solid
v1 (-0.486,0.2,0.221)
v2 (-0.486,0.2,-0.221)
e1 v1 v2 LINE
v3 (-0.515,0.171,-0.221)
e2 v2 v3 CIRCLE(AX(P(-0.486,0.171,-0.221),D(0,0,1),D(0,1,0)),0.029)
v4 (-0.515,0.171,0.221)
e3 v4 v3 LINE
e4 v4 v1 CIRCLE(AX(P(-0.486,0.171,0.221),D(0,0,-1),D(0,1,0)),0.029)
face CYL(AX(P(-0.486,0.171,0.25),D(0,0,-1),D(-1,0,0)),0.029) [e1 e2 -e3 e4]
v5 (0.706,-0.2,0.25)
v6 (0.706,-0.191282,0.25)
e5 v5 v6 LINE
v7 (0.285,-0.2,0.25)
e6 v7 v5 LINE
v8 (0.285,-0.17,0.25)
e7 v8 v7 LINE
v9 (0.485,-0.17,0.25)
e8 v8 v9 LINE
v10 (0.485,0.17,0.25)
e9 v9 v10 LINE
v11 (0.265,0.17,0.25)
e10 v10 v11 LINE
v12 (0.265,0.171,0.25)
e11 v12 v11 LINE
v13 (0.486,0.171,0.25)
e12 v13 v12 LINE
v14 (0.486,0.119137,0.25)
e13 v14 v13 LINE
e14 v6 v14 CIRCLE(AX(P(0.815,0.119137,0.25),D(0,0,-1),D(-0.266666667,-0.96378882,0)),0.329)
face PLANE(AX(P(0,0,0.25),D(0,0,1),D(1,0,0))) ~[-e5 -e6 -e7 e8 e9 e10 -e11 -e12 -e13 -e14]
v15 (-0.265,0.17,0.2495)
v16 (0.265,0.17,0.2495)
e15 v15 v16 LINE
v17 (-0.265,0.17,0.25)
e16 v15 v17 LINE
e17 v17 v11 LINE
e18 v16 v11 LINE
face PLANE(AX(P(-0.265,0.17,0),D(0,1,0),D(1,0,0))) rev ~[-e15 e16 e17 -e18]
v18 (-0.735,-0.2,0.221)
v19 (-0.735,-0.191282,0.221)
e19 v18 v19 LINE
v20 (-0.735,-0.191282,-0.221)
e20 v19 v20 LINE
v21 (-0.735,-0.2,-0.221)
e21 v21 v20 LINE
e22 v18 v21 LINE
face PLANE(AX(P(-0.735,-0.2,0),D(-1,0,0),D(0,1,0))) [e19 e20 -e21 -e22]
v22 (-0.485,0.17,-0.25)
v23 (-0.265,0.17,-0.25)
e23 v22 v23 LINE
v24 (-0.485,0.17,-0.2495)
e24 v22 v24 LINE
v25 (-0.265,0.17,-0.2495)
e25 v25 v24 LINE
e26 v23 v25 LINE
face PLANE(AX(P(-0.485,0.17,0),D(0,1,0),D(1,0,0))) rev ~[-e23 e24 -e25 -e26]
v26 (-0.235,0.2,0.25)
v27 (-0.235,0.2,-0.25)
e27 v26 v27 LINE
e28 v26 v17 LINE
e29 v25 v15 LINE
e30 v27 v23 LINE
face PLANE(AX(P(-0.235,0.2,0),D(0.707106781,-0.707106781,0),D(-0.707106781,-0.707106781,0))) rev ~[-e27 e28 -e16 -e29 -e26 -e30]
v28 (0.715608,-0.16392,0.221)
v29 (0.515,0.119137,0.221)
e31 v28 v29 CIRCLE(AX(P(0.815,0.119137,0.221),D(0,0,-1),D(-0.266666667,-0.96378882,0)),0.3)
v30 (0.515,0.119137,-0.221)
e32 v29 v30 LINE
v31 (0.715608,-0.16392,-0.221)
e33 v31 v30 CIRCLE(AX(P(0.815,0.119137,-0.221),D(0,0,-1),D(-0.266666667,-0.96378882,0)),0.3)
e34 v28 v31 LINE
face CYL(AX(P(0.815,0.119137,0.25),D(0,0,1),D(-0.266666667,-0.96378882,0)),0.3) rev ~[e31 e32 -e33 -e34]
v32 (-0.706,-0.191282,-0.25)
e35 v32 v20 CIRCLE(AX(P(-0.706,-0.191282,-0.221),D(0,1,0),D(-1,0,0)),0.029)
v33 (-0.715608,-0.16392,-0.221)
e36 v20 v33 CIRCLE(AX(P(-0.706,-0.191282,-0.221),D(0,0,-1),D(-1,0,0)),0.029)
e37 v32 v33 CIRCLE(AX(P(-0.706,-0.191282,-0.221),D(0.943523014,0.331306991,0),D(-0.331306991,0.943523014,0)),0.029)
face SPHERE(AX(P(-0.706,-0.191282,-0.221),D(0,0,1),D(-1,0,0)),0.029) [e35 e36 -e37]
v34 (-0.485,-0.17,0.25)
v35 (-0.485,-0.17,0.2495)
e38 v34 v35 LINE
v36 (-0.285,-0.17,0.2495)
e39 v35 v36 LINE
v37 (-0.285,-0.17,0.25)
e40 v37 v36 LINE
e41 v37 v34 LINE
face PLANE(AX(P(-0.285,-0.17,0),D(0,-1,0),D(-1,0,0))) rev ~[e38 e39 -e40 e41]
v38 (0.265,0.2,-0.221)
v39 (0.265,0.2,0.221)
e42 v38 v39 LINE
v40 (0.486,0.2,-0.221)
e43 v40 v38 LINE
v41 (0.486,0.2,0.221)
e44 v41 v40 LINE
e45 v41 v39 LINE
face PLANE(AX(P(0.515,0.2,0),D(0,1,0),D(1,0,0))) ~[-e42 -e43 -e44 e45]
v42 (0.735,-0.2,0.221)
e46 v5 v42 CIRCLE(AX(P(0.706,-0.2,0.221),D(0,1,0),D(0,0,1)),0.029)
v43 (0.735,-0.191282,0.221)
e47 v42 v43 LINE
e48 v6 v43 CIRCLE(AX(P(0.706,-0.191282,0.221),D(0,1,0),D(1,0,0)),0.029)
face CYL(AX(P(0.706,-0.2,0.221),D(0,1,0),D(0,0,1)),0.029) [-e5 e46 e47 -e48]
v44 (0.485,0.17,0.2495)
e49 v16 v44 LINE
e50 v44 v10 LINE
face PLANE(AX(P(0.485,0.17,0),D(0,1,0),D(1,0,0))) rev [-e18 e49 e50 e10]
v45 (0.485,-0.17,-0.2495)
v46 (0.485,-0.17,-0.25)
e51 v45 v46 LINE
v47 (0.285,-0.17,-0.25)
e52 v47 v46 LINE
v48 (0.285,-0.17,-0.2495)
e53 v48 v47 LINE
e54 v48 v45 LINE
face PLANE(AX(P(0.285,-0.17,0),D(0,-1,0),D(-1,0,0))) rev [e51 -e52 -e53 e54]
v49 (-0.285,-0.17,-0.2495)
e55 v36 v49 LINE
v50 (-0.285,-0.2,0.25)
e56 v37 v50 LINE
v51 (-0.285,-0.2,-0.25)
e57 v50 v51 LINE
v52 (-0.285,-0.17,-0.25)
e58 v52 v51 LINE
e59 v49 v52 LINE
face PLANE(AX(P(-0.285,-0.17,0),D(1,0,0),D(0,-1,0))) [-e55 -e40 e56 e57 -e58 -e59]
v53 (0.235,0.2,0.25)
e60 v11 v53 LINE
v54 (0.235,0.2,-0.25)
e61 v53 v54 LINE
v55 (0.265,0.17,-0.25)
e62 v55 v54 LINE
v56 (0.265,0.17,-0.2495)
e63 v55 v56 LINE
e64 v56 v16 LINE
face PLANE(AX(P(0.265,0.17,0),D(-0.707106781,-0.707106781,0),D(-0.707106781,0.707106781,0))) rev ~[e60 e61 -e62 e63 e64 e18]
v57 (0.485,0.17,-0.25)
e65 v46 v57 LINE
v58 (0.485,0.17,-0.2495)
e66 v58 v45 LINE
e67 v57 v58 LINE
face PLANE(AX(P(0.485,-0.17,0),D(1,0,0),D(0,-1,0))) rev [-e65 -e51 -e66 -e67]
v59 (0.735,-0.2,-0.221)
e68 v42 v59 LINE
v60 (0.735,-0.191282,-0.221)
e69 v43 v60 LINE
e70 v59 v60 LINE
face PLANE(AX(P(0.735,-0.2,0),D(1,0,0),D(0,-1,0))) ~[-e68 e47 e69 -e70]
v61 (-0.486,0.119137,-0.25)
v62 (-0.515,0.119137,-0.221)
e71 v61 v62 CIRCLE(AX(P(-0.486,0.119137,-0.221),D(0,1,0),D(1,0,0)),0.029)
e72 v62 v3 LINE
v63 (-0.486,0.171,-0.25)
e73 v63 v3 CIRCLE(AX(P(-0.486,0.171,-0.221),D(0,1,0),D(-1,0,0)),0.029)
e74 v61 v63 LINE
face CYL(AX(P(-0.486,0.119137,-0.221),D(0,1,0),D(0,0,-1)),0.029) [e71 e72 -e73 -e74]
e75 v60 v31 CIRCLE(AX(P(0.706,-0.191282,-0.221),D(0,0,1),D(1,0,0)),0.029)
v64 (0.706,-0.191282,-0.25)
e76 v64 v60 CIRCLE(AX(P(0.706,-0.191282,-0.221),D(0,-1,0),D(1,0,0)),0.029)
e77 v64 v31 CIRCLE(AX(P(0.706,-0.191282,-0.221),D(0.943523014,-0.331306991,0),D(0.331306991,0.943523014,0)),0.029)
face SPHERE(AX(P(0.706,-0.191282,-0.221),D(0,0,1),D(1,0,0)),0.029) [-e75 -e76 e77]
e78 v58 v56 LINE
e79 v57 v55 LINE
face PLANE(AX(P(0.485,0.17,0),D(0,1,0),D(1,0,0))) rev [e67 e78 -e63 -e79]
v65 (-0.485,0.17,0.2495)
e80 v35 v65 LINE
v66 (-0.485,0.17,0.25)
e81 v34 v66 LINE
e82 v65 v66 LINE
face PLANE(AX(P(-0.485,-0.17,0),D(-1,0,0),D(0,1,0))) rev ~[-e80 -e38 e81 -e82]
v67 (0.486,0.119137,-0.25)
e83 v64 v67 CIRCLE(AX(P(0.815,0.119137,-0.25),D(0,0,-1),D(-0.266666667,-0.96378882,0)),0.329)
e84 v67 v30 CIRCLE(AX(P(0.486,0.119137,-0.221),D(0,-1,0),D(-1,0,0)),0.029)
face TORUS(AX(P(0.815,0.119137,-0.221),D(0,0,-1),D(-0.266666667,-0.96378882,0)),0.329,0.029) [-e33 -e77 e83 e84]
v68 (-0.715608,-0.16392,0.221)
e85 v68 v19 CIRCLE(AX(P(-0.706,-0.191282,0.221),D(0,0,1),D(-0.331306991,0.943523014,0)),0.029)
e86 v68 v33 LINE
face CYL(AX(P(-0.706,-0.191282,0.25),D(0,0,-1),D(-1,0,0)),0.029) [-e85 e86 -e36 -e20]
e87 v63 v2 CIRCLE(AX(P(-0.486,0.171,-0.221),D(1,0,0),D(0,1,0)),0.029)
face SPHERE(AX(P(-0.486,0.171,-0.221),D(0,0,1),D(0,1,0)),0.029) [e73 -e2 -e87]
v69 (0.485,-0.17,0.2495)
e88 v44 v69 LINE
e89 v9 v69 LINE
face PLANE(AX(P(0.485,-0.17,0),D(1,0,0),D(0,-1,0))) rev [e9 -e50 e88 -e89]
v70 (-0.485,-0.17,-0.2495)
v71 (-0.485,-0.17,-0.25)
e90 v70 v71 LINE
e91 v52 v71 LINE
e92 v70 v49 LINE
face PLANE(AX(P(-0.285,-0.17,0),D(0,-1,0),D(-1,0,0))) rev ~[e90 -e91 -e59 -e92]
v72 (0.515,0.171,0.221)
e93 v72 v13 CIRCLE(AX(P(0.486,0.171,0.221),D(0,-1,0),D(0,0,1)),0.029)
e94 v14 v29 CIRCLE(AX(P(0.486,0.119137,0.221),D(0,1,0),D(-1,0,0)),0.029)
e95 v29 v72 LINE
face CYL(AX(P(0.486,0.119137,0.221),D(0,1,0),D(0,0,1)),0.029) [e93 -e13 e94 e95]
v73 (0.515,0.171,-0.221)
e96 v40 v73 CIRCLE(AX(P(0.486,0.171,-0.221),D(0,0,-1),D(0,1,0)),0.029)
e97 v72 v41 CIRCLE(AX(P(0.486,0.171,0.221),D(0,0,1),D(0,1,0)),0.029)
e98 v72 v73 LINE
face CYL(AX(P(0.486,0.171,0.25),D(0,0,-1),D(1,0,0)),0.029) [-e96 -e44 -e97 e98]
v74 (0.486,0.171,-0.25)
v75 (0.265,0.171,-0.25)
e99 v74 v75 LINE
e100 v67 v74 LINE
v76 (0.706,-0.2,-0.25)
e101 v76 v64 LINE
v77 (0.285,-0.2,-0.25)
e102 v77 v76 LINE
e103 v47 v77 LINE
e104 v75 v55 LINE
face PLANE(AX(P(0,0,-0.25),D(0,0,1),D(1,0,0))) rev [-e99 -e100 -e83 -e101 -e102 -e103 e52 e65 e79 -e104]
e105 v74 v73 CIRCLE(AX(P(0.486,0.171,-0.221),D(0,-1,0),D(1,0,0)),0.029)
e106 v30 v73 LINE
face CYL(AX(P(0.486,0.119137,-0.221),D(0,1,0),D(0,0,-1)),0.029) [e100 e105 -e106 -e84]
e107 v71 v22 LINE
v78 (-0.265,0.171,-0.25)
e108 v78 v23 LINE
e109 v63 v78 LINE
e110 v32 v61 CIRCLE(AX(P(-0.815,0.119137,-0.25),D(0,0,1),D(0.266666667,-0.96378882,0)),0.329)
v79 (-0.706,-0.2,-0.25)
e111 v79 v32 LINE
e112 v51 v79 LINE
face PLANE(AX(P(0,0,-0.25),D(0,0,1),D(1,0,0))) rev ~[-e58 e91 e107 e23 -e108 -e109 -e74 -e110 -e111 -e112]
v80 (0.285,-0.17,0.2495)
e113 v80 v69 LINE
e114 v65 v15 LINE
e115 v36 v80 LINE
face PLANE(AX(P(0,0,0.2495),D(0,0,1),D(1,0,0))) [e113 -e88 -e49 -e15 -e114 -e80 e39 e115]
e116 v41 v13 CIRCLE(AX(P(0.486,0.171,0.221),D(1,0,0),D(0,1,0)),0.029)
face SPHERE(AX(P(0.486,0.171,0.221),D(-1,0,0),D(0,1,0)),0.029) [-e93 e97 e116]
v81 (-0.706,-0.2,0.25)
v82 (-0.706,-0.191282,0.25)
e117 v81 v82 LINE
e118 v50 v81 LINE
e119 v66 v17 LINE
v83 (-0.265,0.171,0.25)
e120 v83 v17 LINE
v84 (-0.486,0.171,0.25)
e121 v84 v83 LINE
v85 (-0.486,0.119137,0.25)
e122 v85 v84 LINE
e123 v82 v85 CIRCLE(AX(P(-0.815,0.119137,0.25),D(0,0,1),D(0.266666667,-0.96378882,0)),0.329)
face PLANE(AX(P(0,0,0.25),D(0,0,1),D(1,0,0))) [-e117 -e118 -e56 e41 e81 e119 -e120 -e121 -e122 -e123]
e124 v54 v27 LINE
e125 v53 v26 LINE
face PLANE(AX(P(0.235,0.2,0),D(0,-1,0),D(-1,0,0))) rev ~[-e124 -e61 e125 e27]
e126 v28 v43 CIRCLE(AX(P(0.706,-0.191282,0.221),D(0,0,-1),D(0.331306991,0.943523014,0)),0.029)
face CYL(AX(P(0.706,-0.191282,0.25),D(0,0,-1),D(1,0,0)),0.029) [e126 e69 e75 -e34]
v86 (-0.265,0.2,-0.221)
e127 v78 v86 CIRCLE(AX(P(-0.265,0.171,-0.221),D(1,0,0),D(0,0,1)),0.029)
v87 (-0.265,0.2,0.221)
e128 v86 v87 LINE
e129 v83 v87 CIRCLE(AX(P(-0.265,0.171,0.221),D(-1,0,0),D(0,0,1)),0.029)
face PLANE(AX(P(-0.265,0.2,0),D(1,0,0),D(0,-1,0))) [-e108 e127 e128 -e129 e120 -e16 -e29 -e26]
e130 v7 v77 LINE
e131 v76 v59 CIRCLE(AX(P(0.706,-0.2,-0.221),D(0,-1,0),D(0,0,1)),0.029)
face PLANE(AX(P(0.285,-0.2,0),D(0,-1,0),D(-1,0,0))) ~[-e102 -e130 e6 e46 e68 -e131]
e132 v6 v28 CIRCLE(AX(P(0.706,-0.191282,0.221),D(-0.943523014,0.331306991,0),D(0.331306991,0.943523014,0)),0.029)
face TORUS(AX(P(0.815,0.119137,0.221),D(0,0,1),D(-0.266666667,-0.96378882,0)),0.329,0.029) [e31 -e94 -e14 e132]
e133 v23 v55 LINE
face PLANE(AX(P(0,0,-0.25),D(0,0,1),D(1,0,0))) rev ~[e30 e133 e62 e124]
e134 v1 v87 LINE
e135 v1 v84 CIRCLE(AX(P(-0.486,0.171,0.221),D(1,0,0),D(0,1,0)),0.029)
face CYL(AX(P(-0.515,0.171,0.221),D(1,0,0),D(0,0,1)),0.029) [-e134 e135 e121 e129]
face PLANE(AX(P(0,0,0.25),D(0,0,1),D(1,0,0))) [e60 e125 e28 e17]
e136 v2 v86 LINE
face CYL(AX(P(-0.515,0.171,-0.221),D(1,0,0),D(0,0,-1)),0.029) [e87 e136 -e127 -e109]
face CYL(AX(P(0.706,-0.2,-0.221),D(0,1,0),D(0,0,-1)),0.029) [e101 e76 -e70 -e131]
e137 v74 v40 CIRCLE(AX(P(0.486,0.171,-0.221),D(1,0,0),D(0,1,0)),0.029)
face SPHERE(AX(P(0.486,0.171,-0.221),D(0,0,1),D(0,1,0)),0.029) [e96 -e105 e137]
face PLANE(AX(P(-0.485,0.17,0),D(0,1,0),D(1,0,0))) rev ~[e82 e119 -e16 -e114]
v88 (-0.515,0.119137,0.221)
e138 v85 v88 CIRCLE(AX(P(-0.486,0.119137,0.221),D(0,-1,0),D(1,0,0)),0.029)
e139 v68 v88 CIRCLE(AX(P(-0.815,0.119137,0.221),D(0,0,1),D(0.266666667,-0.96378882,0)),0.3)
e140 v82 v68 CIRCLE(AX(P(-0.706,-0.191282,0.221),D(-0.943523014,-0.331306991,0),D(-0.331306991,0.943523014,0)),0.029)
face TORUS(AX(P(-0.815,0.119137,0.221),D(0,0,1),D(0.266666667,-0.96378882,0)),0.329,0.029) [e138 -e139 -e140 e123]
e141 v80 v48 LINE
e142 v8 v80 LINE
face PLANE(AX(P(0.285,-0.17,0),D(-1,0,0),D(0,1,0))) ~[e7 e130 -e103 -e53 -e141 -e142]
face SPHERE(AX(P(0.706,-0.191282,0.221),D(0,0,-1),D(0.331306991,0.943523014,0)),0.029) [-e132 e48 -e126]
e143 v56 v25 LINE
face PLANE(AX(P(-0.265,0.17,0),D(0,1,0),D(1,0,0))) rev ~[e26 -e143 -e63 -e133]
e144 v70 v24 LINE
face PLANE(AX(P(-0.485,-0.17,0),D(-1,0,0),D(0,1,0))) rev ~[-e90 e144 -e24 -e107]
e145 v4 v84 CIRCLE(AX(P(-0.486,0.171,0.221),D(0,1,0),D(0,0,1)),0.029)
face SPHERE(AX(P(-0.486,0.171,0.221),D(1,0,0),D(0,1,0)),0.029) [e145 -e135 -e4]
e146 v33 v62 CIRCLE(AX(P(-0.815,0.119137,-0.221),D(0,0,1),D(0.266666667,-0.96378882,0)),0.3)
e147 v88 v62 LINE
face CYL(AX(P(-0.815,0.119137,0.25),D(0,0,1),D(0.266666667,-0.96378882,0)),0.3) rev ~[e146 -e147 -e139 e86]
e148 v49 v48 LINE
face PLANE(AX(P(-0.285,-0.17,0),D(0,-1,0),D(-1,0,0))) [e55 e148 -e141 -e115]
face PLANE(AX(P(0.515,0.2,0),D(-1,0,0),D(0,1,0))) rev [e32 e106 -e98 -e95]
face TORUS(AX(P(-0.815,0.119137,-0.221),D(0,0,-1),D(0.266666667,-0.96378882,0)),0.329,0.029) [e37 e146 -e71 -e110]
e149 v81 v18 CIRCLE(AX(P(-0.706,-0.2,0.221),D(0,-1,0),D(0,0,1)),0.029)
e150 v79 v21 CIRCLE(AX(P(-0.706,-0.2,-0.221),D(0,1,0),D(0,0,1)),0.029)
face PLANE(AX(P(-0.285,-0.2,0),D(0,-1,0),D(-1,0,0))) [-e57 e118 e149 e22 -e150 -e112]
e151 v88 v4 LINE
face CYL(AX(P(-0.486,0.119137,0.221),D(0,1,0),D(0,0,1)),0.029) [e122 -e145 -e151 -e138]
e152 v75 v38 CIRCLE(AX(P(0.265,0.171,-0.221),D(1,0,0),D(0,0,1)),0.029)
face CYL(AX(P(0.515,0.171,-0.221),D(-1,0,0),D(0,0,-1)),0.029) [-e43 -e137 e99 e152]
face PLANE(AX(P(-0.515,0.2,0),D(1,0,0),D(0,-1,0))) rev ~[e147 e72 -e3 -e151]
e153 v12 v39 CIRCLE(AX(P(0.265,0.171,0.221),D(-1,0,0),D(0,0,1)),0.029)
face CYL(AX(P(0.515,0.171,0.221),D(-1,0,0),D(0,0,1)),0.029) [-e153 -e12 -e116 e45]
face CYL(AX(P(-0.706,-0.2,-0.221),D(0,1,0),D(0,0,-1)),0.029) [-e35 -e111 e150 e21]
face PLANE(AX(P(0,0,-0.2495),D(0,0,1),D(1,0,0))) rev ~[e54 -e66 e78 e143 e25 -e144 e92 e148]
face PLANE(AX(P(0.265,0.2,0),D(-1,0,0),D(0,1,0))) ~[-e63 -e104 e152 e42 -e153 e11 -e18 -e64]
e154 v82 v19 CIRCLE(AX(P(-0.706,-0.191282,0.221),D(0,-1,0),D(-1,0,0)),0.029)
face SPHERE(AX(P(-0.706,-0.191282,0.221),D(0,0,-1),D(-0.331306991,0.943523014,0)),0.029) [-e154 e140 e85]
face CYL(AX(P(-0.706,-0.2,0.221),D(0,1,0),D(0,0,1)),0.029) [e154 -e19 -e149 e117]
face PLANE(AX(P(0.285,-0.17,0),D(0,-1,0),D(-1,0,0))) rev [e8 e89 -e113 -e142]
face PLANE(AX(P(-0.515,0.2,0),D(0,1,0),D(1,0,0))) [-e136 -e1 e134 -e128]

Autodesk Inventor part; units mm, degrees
ref_plane "YZ Plane" through (0, 0, 0) normal (1, 0, 0) x (0, 1, 0)
ref_plane "XZ Plane" through (0, 0, 0) normal (0, 1, 0) x (-1, 0, 0)
ref_plane "XY Plane" through (0, 0, 0) normal (0, 0, 1) x (1, 0, 0)
sketch "Sketch10" plane through (0, 0, 0) normal (0, 0, 1) x (1, 0, 0)
  line L0 (-0.485, 0.17) -> (0.485, 0.17)
  line L1 (0.485, 0.17) -> (0.485, -0.17)
  line L2 (0.485, -0.17) -> (-0.485, -0.17)
  line L3 (-0.485, -0.17) -> (-0.485, 0.17)
  line L4 (-0.265, 0.17) -> (-0.485, 0.17)
  line L5 (-0.515, 0.2) -> (-0.265, 0.2)
  line L6 (-0.265, 0.2) -> (-0.265, 0.17)
  line L7 (-0.515, 0.2) -> (-0.515, -0.17)
  line L8 (-0.485, -0.17) -> (-0.485, 0.17)
  line L9 (-0.285, -0.17) -> (-0.285, -0.2)
  line L10 (-0.285, -0.2) -> (-0.735, -0.2)
  line L11 (-0.735, -0.2) -> (-0.735, -0.17)
  line L12 (-0.735, -0.17) -> (-0.515, -0.17)
  line L13 (-0.485, -0.17) -> (-0.285, -0.17)
  line L14 (-0.265, 0.17) -> (0.265, 0.17)
  line L15 (0.265, 0.17) -> (0.235, 0.2)
  line L16 (0.235, 0.2) -> (-0.235, 0.2)
  line L17 (-0.235, 0.2) -> (-0.265, 0.17)
  point P0 (0, 0)
  point P1 (0, 0.17)
  point P2 (-0.485, 0)
  point P3 (0, 0.2)
  dimension "d11" = 0.2
  dimension "d12" = 0.45
  dimension "d13" = 0.03
  dimension "d14" = 0.03
  dimension "d15" = 0.25
  dimension "d16" = 45
  dimension "d19" = 0.03
  dimension "d21" = 1
  dimension "d22" = 0.4
extrude "Extrusion4" add sketch "Sketch10" along normal mid plane 0.499 contours L0 L1 L2 L3
extrude "Extrusion5" add sketch "Sketch10" along normal mid plane 0.5 contours L3 L2 L9 L10 L11 L12 L7 L5 L6 L0 | L17 L16 L15 L0
fillet "Fillet2" radius 0.3 1 edges at (-0.515, -0.17, 0)
fillet "Fillet3" radius 0.029 10 edges at (-0.39, 0.2, 0.25) (-0.515, 0.2, 0) (-0.39, 0.2, -0.25) (-0.5763, -0.0625, -0.25) (-0.515, 0.1596, -0.25) (-0.5763, -0.0625, 0.25) (-0.515, 0.1596, 0.25) (-0.735, -0.185, 0.25) (-0.735, -0.17, 0) (-0.735, -0.185, -0.25)
mirror "Mirror1" about plane through (0, 0, 0) normal (1, 0, 0) of "Extrusion5", "Fillet2", "Fillet3"
equation "\"d14\" = d13"
equation "\"d19\" = d13"
properties part number "RC0402FR-074K7L Resistor"
